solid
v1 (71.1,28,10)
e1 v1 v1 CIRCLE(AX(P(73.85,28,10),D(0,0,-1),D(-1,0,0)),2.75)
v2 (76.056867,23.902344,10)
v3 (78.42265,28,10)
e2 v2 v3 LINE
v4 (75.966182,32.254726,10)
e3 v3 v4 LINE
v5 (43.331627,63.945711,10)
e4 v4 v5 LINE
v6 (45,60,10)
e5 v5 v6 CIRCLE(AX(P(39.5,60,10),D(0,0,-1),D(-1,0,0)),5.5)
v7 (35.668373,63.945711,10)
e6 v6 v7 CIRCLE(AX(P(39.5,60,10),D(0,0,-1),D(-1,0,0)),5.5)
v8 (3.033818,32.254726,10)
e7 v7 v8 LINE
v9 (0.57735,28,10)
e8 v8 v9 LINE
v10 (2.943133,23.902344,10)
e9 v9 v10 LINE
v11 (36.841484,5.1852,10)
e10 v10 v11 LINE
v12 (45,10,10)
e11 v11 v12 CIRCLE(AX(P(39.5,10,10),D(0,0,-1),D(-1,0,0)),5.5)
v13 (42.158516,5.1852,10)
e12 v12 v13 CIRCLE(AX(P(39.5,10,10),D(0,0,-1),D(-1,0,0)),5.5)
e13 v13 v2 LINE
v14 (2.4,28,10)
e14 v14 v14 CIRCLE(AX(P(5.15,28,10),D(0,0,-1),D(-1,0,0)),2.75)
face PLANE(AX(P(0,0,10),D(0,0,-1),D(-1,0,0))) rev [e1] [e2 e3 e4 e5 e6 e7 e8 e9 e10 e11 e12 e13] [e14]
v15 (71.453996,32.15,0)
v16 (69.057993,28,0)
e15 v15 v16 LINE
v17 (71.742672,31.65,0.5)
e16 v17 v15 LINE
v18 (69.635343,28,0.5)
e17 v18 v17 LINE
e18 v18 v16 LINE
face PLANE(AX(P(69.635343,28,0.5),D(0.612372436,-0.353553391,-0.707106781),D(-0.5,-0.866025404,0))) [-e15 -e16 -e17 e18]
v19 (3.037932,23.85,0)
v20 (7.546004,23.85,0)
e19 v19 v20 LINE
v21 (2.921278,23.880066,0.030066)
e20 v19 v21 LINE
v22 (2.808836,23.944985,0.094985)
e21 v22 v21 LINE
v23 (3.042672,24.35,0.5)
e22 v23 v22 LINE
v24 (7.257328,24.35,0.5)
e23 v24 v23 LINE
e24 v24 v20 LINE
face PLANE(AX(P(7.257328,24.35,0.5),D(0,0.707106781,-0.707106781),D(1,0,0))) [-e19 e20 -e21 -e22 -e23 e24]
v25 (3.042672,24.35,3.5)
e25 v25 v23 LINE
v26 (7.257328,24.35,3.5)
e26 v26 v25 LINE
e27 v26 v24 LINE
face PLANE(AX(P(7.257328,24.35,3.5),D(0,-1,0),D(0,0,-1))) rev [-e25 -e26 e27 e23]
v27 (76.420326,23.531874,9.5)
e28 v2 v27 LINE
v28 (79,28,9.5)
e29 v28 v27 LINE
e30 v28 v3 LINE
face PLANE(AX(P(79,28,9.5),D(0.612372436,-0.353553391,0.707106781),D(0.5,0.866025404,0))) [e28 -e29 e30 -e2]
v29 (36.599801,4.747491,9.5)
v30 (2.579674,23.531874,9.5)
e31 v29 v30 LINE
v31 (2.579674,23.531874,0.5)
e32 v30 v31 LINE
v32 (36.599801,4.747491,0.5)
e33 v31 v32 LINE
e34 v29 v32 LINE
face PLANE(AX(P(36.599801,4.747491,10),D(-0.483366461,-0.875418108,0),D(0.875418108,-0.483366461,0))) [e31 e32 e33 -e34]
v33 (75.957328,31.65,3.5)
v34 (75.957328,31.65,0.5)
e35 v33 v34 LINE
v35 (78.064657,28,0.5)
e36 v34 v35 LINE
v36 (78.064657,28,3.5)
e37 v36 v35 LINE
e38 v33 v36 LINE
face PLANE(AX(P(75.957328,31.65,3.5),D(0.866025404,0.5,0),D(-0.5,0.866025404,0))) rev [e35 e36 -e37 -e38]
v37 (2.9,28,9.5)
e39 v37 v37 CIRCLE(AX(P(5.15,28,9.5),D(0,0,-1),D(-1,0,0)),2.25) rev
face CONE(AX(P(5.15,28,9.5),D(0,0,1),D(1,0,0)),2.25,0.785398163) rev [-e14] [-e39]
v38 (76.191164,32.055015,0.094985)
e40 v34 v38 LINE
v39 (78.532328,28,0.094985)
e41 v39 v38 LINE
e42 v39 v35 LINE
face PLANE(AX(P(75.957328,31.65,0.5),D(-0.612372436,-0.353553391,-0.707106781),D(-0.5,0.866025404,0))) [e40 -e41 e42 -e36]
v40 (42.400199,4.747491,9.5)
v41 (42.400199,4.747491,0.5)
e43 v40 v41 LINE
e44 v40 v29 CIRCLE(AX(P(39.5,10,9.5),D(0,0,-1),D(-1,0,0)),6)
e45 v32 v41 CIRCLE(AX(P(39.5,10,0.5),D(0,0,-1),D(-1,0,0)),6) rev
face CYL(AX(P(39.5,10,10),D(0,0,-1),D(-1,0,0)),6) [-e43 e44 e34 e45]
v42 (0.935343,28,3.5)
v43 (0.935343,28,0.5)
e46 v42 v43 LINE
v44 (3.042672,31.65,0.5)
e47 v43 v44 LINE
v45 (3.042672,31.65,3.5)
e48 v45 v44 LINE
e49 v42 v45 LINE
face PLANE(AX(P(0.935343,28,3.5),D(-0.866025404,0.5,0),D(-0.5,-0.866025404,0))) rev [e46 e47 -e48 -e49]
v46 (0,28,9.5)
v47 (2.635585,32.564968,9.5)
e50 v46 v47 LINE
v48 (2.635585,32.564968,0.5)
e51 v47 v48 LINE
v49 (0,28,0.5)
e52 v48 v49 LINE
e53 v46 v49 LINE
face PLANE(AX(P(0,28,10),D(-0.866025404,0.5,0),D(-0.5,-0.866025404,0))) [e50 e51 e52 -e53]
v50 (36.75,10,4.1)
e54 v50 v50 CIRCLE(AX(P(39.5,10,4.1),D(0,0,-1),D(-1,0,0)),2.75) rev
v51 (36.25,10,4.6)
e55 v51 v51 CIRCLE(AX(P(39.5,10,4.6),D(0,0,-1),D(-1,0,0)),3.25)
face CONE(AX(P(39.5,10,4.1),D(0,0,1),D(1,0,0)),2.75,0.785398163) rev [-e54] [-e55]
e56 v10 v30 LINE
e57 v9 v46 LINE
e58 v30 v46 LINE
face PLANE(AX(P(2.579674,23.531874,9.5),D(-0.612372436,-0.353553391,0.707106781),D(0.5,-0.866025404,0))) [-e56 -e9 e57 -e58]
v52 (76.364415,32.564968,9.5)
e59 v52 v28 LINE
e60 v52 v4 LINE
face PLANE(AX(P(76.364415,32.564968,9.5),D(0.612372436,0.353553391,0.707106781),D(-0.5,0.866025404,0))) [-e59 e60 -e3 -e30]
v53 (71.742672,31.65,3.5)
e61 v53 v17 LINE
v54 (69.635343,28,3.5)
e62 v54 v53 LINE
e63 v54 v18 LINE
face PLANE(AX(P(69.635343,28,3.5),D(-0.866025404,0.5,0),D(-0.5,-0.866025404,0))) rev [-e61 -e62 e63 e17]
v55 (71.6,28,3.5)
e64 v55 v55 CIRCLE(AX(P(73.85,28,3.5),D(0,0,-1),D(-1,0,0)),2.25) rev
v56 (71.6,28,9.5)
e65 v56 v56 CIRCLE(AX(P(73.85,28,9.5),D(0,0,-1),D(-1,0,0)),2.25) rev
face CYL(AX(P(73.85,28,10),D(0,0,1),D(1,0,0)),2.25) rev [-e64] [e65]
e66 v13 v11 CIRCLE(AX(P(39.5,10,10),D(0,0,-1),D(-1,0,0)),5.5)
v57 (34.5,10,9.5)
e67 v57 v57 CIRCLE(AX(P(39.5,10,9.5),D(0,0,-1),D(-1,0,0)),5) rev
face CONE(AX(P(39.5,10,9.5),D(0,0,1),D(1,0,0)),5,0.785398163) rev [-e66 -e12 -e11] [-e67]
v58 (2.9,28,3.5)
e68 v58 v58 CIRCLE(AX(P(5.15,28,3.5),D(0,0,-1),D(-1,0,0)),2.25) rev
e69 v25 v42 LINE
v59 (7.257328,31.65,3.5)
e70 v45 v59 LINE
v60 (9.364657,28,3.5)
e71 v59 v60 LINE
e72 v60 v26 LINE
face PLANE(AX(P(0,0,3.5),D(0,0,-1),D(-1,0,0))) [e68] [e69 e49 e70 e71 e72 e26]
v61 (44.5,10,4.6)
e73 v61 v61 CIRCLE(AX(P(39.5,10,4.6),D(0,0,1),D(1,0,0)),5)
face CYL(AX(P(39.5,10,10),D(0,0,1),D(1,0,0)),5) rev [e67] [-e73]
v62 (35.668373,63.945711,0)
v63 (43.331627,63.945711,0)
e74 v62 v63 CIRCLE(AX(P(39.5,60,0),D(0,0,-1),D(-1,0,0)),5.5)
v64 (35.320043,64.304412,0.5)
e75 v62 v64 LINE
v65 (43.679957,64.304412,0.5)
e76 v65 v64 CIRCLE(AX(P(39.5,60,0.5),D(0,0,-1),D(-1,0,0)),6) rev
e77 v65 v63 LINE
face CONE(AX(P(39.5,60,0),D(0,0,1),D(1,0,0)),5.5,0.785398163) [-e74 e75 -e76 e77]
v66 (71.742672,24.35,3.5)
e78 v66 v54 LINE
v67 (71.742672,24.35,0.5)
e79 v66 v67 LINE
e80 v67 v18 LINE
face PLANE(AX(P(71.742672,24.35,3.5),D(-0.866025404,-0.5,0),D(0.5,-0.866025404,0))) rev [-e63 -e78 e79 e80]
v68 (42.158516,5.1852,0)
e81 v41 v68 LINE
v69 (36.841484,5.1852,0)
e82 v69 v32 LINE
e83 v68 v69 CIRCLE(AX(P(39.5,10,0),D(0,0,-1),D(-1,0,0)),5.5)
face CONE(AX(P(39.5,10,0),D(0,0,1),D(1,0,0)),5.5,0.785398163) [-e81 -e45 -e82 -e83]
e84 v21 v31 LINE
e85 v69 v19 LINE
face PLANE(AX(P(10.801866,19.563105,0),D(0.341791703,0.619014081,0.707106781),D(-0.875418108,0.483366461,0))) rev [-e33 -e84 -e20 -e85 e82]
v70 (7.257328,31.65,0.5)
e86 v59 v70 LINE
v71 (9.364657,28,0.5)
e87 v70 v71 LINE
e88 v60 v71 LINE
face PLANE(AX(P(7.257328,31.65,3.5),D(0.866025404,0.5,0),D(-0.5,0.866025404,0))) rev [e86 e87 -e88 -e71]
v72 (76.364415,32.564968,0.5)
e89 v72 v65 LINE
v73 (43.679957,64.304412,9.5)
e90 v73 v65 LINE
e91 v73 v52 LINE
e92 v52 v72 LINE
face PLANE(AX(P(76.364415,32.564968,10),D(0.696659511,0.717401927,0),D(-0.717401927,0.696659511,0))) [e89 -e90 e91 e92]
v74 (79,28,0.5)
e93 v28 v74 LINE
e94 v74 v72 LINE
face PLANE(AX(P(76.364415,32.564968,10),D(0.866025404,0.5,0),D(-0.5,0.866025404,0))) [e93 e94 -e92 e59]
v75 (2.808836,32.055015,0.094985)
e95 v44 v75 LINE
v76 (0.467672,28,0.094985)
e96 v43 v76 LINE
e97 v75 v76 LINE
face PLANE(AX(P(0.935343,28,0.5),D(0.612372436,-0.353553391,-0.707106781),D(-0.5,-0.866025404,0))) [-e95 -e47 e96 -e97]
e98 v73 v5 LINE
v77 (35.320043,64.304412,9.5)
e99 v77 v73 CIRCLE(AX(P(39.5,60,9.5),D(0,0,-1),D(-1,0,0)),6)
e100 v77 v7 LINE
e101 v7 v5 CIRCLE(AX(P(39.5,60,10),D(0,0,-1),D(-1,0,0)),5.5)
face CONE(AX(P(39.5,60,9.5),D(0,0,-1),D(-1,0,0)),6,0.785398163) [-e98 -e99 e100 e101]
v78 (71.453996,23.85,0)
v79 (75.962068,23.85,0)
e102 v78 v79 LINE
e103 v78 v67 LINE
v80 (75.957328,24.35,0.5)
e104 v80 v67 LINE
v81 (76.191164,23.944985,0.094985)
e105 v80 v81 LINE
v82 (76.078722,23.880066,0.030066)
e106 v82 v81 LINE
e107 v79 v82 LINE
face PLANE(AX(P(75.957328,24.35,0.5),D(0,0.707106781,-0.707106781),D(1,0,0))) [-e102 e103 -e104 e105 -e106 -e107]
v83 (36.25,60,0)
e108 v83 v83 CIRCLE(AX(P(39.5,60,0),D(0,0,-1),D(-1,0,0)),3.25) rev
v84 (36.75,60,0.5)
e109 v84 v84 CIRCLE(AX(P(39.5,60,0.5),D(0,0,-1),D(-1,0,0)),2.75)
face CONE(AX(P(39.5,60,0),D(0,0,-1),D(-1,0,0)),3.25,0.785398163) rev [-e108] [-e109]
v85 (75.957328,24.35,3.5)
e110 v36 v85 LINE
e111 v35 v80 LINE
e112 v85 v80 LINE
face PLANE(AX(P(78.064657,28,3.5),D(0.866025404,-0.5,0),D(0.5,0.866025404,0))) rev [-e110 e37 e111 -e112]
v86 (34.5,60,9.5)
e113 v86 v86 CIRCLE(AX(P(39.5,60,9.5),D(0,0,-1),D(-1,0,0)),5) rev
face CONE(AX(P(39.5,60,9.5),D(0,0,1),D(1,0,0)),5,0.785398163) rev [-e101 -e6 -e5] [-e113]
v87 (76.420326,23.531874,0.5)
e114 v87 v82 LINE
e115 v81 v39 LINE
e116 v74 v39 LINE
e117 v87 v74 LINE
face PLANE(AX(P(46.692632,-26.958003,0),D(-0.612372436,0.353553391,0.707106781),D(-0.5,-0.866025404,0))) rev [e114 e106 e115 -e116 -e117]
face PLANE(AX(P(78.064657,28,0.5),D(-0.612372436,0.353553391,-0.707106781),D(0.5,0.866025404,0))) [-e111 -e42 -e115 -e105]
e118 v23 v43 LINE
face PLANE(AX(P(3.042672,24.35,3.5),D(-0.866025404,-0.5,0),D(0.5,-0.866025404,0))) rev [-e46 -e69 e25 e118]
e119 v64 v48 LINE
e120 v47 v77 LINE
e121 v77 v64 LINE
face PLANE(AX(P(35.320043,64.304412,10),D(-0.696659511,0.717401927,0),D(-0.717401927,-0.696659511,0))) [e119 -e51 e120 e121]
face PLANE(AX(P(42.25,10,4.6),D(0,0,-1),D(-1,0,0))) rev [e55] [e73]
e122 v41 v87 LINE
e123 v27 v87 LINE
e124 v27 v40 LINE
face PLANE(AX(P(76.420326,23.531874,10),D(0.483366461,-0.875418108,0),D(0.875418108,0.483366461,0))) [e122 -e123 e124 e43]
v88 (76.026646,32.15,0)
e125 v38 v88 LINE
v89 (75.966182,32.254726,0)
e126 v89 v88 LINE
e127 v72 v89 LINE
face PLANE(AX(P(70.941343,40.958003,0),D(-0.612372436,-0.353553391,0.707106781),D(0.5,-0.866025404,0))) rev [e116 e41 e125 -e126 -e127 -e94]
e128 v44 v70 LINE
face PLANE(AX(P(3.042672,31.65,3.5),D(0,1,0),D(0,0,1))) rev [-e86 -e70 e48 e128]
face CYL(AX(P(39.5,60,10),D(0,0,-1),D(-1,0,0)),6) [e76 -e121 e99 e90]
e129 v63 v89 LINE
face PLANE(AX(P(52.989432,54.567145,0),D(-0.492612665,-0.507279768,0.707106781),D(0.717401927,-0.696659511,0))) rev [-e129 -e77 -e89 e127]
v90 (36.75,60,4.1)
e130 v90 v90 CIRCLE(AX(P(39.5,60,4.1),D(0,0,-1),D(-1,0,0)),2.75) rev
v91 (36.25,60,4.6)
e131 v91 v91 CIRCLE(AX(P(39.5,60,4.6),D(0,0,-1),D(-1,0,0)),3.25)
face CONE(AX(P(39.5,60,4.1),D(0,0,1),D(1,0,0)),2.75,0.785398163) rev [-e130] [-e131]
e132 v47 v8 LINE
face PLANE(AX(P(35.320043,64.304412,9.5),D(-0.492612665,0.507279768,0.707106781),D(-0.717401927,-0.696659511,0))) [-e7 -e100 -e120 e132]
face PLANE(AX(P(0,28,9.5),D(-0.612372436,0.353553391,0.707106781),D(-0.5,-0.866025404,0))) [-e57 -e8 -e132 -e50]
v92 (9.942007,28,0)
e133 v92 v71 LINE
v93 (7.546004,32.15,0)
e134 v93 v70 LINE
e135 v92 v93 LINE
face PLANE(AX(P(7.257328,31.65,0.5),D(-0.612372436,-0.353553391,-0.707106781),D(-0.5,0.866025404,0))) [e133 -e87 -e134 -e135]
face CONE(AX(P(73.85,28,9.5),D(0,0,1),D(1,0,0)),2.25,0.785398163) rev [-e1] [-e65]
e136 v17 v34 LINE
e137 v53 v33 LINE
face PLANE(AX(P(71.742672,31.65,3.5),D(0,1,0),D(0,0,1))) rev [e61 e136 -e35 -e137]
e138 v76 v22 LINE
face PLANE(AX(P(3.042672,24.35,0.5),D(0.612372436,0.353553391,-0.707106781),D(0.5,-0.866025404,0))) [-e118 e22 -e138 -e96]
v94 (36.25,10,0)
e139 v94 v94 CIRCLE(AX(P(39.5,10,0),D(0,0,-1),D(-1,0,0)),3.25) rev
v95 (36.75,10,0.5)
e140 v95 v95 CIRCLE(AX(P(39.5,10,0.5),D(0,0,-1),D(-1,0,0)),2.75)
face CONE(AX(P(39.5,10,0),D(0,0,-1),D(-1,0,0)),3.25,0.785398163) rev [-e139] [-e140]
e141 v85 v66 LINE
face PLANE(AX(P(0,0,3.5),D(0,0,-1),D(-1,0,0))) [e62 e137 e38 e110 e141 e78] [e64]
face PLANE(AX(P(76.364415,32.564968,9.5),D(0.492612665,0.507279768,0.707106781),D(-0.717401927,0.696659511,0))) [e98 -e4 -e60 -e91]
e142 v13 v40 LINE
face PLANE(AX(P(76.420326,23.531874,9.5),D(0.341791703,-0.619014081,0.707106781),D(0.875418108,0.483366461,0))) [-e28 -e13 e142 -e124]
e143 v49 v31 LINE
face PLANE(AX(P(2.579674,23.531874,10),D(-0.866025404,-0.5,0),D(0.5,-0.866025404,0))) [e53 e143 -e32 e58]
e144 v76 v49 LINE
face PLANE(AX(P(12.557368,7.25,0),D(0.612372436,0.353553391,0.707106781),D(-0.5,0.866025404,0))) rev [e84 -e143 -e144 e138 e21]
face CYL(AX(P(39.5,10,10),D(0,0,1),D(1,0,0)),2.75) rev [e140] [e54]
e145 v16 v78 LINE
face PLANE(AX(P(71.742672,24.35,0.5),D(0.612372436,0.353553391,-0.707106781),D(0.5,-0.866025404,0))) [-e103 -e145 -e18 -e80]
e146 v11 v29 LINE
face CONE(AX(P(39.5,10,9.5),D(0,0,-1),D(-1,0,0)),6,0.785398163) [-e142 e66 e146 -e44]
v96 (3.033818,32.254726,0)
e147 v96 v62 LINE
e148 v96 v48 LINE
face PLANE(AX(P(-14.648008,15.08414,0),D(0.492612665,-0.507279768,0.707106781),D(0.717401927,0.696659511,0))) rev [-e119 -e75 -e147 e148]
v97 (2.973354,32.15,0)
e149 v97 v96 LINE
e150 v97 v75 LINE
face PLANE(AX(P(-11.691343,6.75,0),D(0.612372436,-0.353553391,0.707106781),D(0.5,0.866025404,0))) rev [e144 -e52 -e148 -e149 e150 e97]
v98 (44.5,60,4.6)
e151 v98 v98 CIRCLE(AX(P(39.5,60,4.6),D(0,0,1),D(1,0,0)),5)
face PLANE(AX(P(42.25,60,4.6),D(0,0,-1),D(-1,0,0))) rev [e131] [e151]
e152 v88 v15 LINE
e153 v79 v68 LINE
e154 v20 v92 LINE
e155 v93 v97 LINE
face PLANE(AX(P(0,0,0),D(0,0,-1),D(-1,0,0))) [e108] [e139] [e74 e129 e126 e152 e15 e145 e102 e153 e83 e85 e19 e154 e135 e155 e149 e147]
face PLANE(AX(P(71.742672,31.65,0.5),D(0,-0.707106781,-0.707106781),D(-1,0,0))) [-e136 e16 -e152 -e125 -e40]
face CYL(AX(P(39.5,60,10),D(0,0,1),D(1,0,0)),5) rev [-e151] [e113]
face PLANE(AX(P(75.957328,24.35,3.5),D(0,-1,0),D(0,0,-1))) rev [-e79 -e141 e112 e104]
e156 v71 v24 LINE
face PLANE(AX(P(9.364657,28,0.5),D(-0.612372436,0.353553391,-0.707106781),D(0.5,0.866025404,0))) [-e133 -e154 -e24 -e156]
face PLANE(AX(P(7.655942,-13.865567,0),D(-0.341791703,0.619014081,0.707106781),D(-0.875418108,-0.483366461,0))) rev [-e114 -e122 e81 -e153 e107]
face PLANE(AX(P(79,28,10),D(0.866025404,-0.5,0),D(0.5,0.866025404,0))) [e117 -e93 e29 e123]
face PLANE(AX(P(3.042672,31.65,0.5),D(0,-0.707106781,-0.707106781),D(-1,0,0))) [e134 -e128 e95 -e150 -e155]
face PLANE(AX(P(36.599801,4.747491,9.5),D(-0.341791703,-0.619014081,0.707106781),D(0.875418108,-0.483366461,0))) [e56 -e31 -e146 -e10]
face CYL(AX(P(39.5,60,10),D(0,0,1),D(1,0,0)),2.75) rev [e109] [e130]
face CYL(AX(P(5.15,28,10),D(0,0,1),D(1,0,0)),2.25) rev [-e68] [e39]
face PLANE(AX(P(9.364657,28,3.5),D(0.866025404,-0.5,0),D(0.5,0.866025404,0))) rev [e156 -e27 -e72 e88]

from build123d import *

# Parameters (mm, degrees)
SKETCH1_W                                       = 79
SKETCH1_H                                       = 70
BOSS_EXTRUDE1_DEPTH                             = 10
M4_CLEARANCE_HOLE1_D                            = 4.5
CUT_EXTRUDE3_DEPTH                              = 3.5
CBORE_FOR_M5_SOCKET_HEAD_CAP_SCREW1_D           = 5.5
CBORE_FOR_M5_SOCKET_HEAD_CAP_SCREW1_CBORE_D     = 10
CBORE_FOR_M5_SOCKET_HEAD_CAP_SCREW1_CBORE_DEPTH = 5.4
CUT_EXTRUDE4_DEPTH                              = 10
CHAMFER1_SIZE                                   = 0.5
CHAMFER2_SIZE                                   = 0.5


with BuildPart() as part:
    # Sketch1 → Boss-Extrude1 (new body)
    with BuildSketch(Plane.XY):
        with Locations((39.5, 35)):
            Rectangle(SKETCH1_W, SKETCH1_H)
    extrude(amount=BOSS_EXTRUDE1_DEPTH)

    # M4 Clearance Hole1 (through all)
    with Locations(Plane.XY.offset(10)):
        with Locations((5.15, 28), (73.85, 28)):
            Hole(M4_CLEARANCE_HOLE1_D / 2)

    # Sketch11 → Cut-Extrude3 (cut)
    with BuildSketch(Plane(origin=(0, 0, 0), x_dir=(-1, 0, 0), z_dir=(0, 0, -1))):
        Polygon((-69.635343035, 28), (-71.742671517, 31.65), (-75.957328483, 31.65), (-78.064656965, 28), (-75.957328483, 24.35), (-71.742671517, 24.35), align=None)
        Polygon((-9.364656965, 28), (-7.257328483, 24.35), (-3.042671517, 24.35), (-0.935343035, 28), (-3.042671517, 31.65), (-7.257328483, 31.65), align=None)
    extrude(amount=-CUT_EXTRUDE3_DEPTH, mode=Mode.SUBTRACT)

    # CBORE for M5 Socket Head Cap Screw1 (through all)
    with Locations(Plane.XY.offset(10)):
        with Locations((39.5, 60), (39.5, 10)):
            CounterBoreHole(CBORE_FOR_M5_SOCKET_HEAD_CAP_SCREW1_D / 2, CBORE_FOR_M5_SOCKET_HEAD_CAP_SCREW1_CBORE_D / 2, CBORE_FOR_M5_SOCKET_HEAD_CAP_SCREW1_CBORE_DEPTH)

    # Sketch17 → Cut-Extrude4 (cut)
    with BuildSketch(Plane(origin=(0, 0, 0), x_dir=(-1, 0, 0), z_dir=(0, 0, -1))):
        with BuildLine():
            Line((-125.188021535, 28), (-105.497086029, -6.105700744))
            Line((-105.497086029, -6.105700744), (-61.734857215, -30.269232978))
            ThreePointArc((-61.734857215, -30.269232978), (-39.5, -36), (-17.265142785, -30.269232978))
            Line((-17.265142785, -30.269232978), (26.497086029, -6.105700744))
            Line((26.497086029, -6.105700744), (46.188021535, 28))
            Line((46.188021535, 28), (29.223015539, 57.384252336))
            Line((29.223015539, 57.384252336), (-7.453662483, 93.00048866))
            ThreePointArc((-7.453662483, 93.00048866), (-39.5, 106), (-71.546337517, 93.00048866))
            Line((-71.546337517, 93.00048866), (-108.223015539, 57.384252336))
            Line((-108.223015539, 57.384252336), (-125.188021535, 28))
        make_face()
        with BuildLine():
            Line((-76.364414771, 32.564967524), (-43.679957067, 64.304411564))
            ThreePointArc((-43.679957067, 64.304411564), (-39.5, 66), (-35.320042933, 64.304411564))
            Line((-35.320042933, 64.304411564), (-2.635585229, 32.564967524))
            Line((-2.635585229, 32.564967524), (0, 28))
            Line((0, 28), (-2.579673838, 23.531873846))
            Line((-2.579673838, 23.531873846), (-36.599801233, 4.747491351))
            ThreePointArc((-36.599801233, 4.747491351), (-39.5, 4), (-42.400198767, 4.747491351))
            Line((-42.400198767, 4.747491351), (-76.420326162, 23.531873846))
            Line((-76.420326162, 23.531873846), (-79, 28))
            Line((-79, 28), (-76.364414771, 32.564967524))
        make_face(mode=Mode.SUBTRACT)
    extrude(amount=-CUT_EXTRUDE4_DEPTH, mode=Mode.SUBTRACT)

    # Chamfer1
    # the kernel refuses this chamfer: 0.5 mm, written as the material it takes off along each edge
    with BuildSketch(Plane(origin=(39.5, 10, 10), x_dir=(1, 0, 0), z_dir=(0, -1, 0))) as chamfer1_piece_1:
        Polygon((5 + CHAMFER1_SIZE, 0), (5, -CHAMFER1_SIZE), (5, 0), align=None)
    revolve(axis=Axis((39.5, 10, 10), (0, 0, 1)), mode=Mode.SUBTRACT)
    with BuildSketch(Plane(origin=(39.5, 10, 0), x_dir=(-1, 0, 0), z_dir=(0, -1, 0))) as chamfer1_piece_2:
        Polygon((2.75 + CHAMFER1_SIZE, 0), (2.75, -CHAMFER1_SIZE), (2.75, 0), align=None)
    revolve(axis=Axis((39.5, 10, 0), (0, 0, -1)), mode=Mode.SUBTRACT)
    with BuildSketch(Plane(origin=(39.5, 60, 10), x_dir=(1, 0, 0), z_dir=(0, -1, 0))) as chamfer1_piece_3:
        Polygon((5 + CHAMFER1_SIZE, 0), (5, -CHAMFER1_SIZE), (5, 0), align=None)
    revolve(axis=Axis((39.5, 60, 10), (0, 0, 1)), mode=Mode.SUBTRACT)
    with BuildSketch(Plane(origin=(39.5, 60, 0), x_dir=(-1, 0, 0), z_dir=(0, -1, 0))) as chamfer1_piece_4:
        Polygon((2.75 + CHAMFER1_SIZE, 0), (2.75, -CHAMFER1_SIZE), (2.75, 0), align=None)
    revolve(axis=Axis((39.5, 60, 0), (0, 0, -1)), mode=Mode.SUBTRACT)
    with BuildSketch(Plane(origin=(73.85, 28, 10), x_dir=(-1, 0, 0), z_dir=(0, -1, 0))) as chamfer1_piece_5:
        Polygon((2.25 + CHAMFER1_SIZE, 0), (2.25, CHAMFER1_SIZE), (2.25, 0), align=None)
    revolve(axis=Axis((73.85, 28, 10), (0, 0, -1)), mode=Mode.SUBTRACT)
    with BuildSketch(Plane(origin=(75.777405415, 22.418302447, 10), x_dir=(-0.8656979742248806, 0.49981095845564805, 0.02749587661058518), z_dir=(0.49999999999999967, 0.8660254037844388, 0)), Plane(origin=(-0.642920747, 29.113571399, 0), x_dir=(-0.023812127644091078, -0.013747938305293715, 0.9996219169112968), z_dir=(0.5000000000000001, -0.8660254037844387, 0))) as chamfer1_piece_6:
        Polygon((CHAMFER1_SIZE * 0.999621916911, -CHAMFER1_SIZE * 0.0274958766106), (-CHAMFER1_SIZE * 0.0274958766106, -CHAMFER1_SIZE * 0.999621916911), (0, 0), align=None)
    extrude(amount=7.731030664, mode=Mode.SUBTRACT)
    with BuildSketch(Plane(origin=(42.400198767, 4.747491351, 10), x_dir=(-0.4831837085028112, 0.8750871274375402, 0.027495876610585696), z_dir=(0.8754181082198028, 0.4833664611874326, 0)), Plane(origin=(1.45402491, 24.153406499, 10), x_dir=(0.4831837085028113, 0.8750871274375401, 0.027495876610585605), z_dir=(0.8754181082198027, -0.48336646118743265, 0))) as chamfer1_piece_7:
        Polygon((CHAMFER1_SIZE * 0.999621916911, -CHAMFER1_SIZE * 0.0274958766106), (-CHAMFER1_SIZE * 0.0274958766106, -CHAMFER1_SIZE * 0.999621916911), (0, 0), align=None)
    extrude(amount=40.147417552, mode=Mode.SUBTRACT)
    with BuildSketch(Plane(origin=(39.5, 10, 10), x_dir=(-0.48336646118743537, -0.8754181082198011, 0), z_dir=(-0.8754181082198011, 0.48336646118743537, 0))) as chamfer1_piece_8:
        Polygon((6 - CHAMFER1_SIZE, 0), (6, -CHAMFER1_SIZE), (6, 0), align=None)
    revolve(axis=Axis((39.5, 10, 10), (0, 0, 1)), revolution_arc=57.811005445, mode=Mode.SUBTRACT)
    with BuildSketch(Plane(origin=(-0.642920747, 29.113571399, 10), x_dir=(-0.023812127644091095, -0.013747938305293727, -0.9996219169112968), z_dir=(0.5000000000000001, -0.8660254037844387, 0)), Plane(origin=(75.777405415, 22.418302447, 0), x_dir=(-0.8656979742248806, 0.49981095845564805, -0.02749587661058547), z_dir=(0.49999999999999967, 0.8660254037844388, 0))) as chamfer1_piece_9:
        Polygon((CHAMFER1_SIZE * 0.999621916911, CHAMFER1_SIZE * 0.0274958766106), (-CHAMFER1_SIZE * 0.0274958766106, CHAMFER1_SIZE * 0.999621916911), (0, 0), align=None)
    extrude(amount=7.731030664, mode=Mode.SUBTRACT)
    with BuildSketch(Plane(origin=(3.278505976, 33.678538923, 10), x_dir=(-0.023812127644088344, 0.013747938305292137, -0.9996219169112968), z_dir=(-0.5000000000000001, -0.8660254037844387, 0)), Plane(origin=(79.642920747, 26.886428601, 0), x_dir=(-0.865697974224879, -0.49981095845565066, -0.02749587661058581), z_dir=(-0.5000000000000023, 0.8660254037844374, 0))) as chamfer1_piece_10:
        Polygon((CHAMFER1_SIZE * 0.999621916911, CHAMFER1_SIZE * 0.0274958766106), (-CHAMFER1_SIZE * 0.0274958766106, CHAMFER1_SIZE * 0.999621916911), (0, 0), align=None)
    extrude(amount=7.842853445, mode=Mode.SUBTRACT)
    with BuildSketch(Plane(origin=(35.320042933, 64.304411564, 10), x_dir=(-0.019155263960327032, 0.019725594875552394, -0.999621916911297), z_dir=(-0.7174019273843597, -0.6966595112285529, 0)), Plane(origin=(77.286879937, 31.669173817, 0), x_dir=(-0.6963961160487728, -0.7171306898478127, -0.027495876610586643), z_dir=(-0.7174019273843598, 0.6966595112285526, 0))) as chamfer1_piece_11:
        Polygon((CHAMFER1_SIZE * 0.999621916911, CHAMFER1_SIZE * 0.0274958766106), (-CHAMFER1_SIZE * 0.0274958766106, CHAMFER1_SIZE * 0.999621916911), (0, 0), align=None)
    extrude(amount=46.845320018, mode=Mode.SUBTRACT)
    with BuildSketch(Plane(origin=(39.5, 60, 10), x_dir=(0.6966595112285513, 0.7174019273843611, 0), z_dir=(0.7174019273843611, -0.6966595112285513, 0))) as chamfer1_piece_12:
        Polygon((6 - CHAMFER1_SIZE, 0), (6, -CHAMFER1_SIZE), (6, 0), align=None)
    revolve(axis=Axis((39.5, 60, 10), (0, 0, 1)), revolution_arc=88.31921352, mode=Mode.SUBTRACT)
    with BuildSketch(Plane(origin=(77.286879937, 31.669173817, 10), x_dir=(-0.6963961160487728, -0.7171306898478127, 0.027495876610585824), z_dir=(-0.7174019273843598, 0.6966595112285526, 0)), Plane(origin=(35.320042933, 64.304411564, 0), x_dir=(-0.019155263960327015, 0.019725594875552376, 0.999621916911297), z_dir=(-0.7174019273843597, -0.6966595112285529, 0))) as chamfer1_piece_13:
        Polygon((CHAMFER1_SIZE * 0.999621916911, -CHAMFER1_SIZE * 0.0274958766106), (-CHAMFER1_SIZE * 0.0274958766106, -CHAMFER1_SIZE * 0.999621916911), (0, 0), align=None)
    extrude(amount=46.845320018, mode=Mode.SUBTRACT)
    with BuildSketch(Plane(origin=(79.642920747, 26.886428601, 10), x_dir=(-0.865697974224879, -0.49981095845565066, 0.02749587661058518), z_dir=(-0.5000000000000023, 0.8660254037844374, 0)), Plane(origin=(3.278505976, 33.678538923, 0), x_dir=(-0.023812127644088323, 0.013747938305292124, 0.9996219169112968), z_dir=(-0.5000000000000001, -0.8660254037844387, 0))) as chamfer1_piece_14:
        Polygon((CHAMFER1_SIZE * 0.999621916911, -CHAMFER1_SIZE * 0.0274958766106), (-CHAMFER1_SIZE * 0.0274958766106, -CHAMFER1_SIZE * 0.999621916911), (0, 0), align=None)
    extrude(amount=7.842853445, mode=Mode.SUBTRACT)
    with BuildSketch(Plane(origin=(5.15, 28, 10), x_dir=(-1, 0, 0), z_dir=(0, -1, 0))) as chamfer1_piece_15:
        Polygon((2.25 + CHAMFER1_SIZE, 0), (2.25, CHAMFER1_SIZE), (2.25, 0), align=None)
    revolve(axis=Axis((5.15, 28, 10), (0, 0, -1)), mode=Mode.SUBTRACT)
    with BuildSketch(Plane(origin=(39.5, 60, 0), x_dir=(0.6966595112285513, 0.7174019273843611, 0), z_dir=(0.7174019273843611, -0.6966595112285513, 0))) as chamfer1_piece_16:
        Polygon((6 - CHAMFER1_SIZE, 0), (6, CHAMFER1_SIZE), (6, 0), align=None)
    revolve(axis=Axis((39.5, 60, 0), (0, 0, 1)), revolution_arc=88.31921352, mode=Mode.SUBTRACT)
    with BuildSketch(Plane(origin=(1.45402491, 24.153406499, 0), x_dir=(0.4831837085028113, 0.8750871274375401, -0.02749587661058645), z_dir=(0.8754181082198027, -0.48336646118743265, 0)), Plane(origin=(42.400198767, 4.747491351, 0), x_dir=(-0.4831837085028112, 0.8750871274375402, -0.027495876610586435), z_dir=(0.8754181082198028, 0.4833664611874326, 0))) as chamfer1_piece_17:
        Polygon((CHAMFER1_SIZE * 0.999621916911, CHAMFER1_SIZE * 0.0274958766106), (-CHAMFER1_SIZE * 0.0274958766106, CHAMFER1_SIZE * 0.999621916911), (0, 0), align=None)
    extrude(amount=40.147417552, mode=Mode.SUBTRACT)
    with BuildSketch(Plane(origin=(39.5, 10, 0), x_dir=(-0.48336646118743537, -0.8754181082198011, 0), z_dir=(-0.8754181082198011, 0.48336646118743537, 0))) as chamfer1_piece_18:
        Polygon((6 - CHAMFER1_SIZE, 0), (6, CHAMFER1_SIZE), (6, 0), align=None)
    revolve(axis=Axis((39.5, 10, 0), (0, 0, 1)), revolution_arc=57.811005445, mode=Mode.SUBTRACT)
    with BuildSketch(Plane(origin=(72.385592264, 23.236428601, 0), x_dir=(-0.8656979742248802, -0.49981095845564877, -0.02749587661058547), z_dir=(-0.5000000000000004, 0.8660254037844384, 0))) as chamfer1_piece_19_section:
        Polygon((CHAMFER1_SIZE * 0.999621916911, CHAMFER1_SIZE * 0.0274958766106), (-CHAMFER1_SIZE * 0.0274958766106, CHAMFER1_SIZE * 0.999621916911), (0, 0), align=None)
    chamfer1_piece_19 = extrude(amount=6.786339953, mode=Mode.PRIVATE)
    chamfer1_piece_19 = split(chamfer1_piece_19, bisect_by=Plane(origin=(70.550147439, 24.35, 0.167332088), z_dir=(0, 1, 0)), keep=Keep.TOP, mode=Mode.PRIVATE)
    chamfer1_piece_19 = split(chamfer1_piece_19, bisect_by=Plane(origin=(69.039080996, 26.967243853, 0.167332088), z_dir=(0.8660254037844369, -0.5000000000000031, 0)), keep=Keep.TOP, mode=Mode.PRIVATE)
    add(chamfer1_piece_19, mode=Mode.SUBTRACT)
    with BuildSketch(Plane(origin=(68.992422288, 26.886428601, 0), x_dir=(-0.8656979742248786, 0.4998109584556514, -0.027495876610586244), z_dir=(0.5000000000000031, 0.866025403784437, 0))) as chamfer1_piece_20_section:
        Polygon((CHAMFER1_SIZE * 0.999621916911, CHAMFER1_SIZE * 0.0274958766106), (-CHAMFER1_SIZE * 0.0274958766106, CHAMFER1_SIZE * 0.999621916911), (0, 0), align=None)
    chamfer1_piece_20 = extrude(amount=6.786339953, mode=Mode.PRIVATE)
    chamfer1_piece_20 = split(chamfer1_piece_20, bisect_by=Plane(origin=(69.039080996, 29.032756147, 0.167332088), z_dir=(0.8660254037844384, 0.5000000000000004, 0)), keep=Keep.TOP, mode=Mode.PRIVATE)
    chamfer1_piece_20 = split(chamfer1_piece_20, bisect_by=Plane(origin=(70.550147439, 31.65, 0.167332088), z_dir=(0, -1, 0)), keep=Keep.TOP, mode=Mode.PRIVATE)
    add(chamfer1_piece_20, mode=Mode.SUBTRACT)
    with BuildSketch(Plane(origin=(70.456830023, 31.65, 0), x_dir=(0, 0.9996219169112968, -0.027495876610586483), z_dir=(1, 0, 0))) as chamfer1_piece_21_section:
        Polygon((CHAMFER1_SIZE * 0.999621916911, CHAMFER1_SIZE * 0.0274958766106), (-CHAMFER1_SIZE * 0.0274958766106, CHAMFER1_SIZE * 0.999621916911), (0, 0), align=None)
    chamfer1_piece_21 = extrude(amount=6.786339953, mode=Mode.PRIVATE)
    chamfer1_piece_21 = split(chamfer1_piece_21, bisect_by=Plane(origin=(72.338933557, 32.682756147, 0.167332088), z_dir=(0.8660254037844369, -0.5000000000000031, 0)), keep=Keep.TOP, mode=Mode.PRIVATE)
    chamfer1_piece_21 = split(chamfer1_piece_21, bisect_by=Plane(origin=(75.361066443, 32.682756147, 0.167332088), z_dir=(-0.8660254037844393, -0.499999999999999, 0)), keep=Keep.TOP, mode=Mode.PRIVATE)
    add(chamfer1_piece_21, mode=Mode.SUBTRACT)
    with BuildSketch(Plane(origin=(75.314407736, 32.763571399, 0), x_dir=(0.8656979742248809, 0.4998109584556474, -0.02749587661058581), z_dir=(0.499999999999999, -0.8660254037844393, 0))) as chamfer1_piece_22_section:
        Polygon((CHAMFER1_SIZE * 0.999621916911, CHAMFER1_SIZE * 0.0274958766106), (-CHAMFER1_SIZE * 0.0274958766106, CHAMFER1_SIZE * 0.999621916911), (0, 0), align=None)
    chamfer1_piece_22 = extrude(amount=6.786339953, mode=Mode.PRIVATE)
    chamfer1_piece_22 = split(chamfer1_piece_22, bisect_by=Plane(origin=(78.660919005, 29.032756147, 0.167332088), z_dir=(-0.866025403784439, 0.4999999999999994, 0)), keep=Keep.TOP, mode=Mode.PRIVATE)
    chamfer1_piece_22 = split(chamfer1_piece_22, bisect_by=Plane(origin=(77.14985256, 31.65, 0.167332088), z_dir=(0, -1, 0)), keep=Keep.TOP, mode=Mode.PRIVATE)
    add(chamfer1_piece_22, mode=Mode.SUBTRACT)
    with BuildSketch(Plane(origin=(78.707577712, 29.113571399, 0), x_dir=(0.8656979742248807, -0.4998109584556477, -0.02749587661058552), z_dir=(-0.4999999999999994, -0.866025403784439, 0))) as chamfer1_piece_23_section:
        Polygon((CHAMFER1_SIZE * 0.999621916911, CHAMFER1_SIZE * 0.0274958766106), (-CHAMFER1_SIZE * 0.0274958766106, CHAMFER1_SIZE * 0.999621916911), (0, 0), align=None)
    chamfer1_piece_23 = extrude(amount=6.786339953, mode=Mode.PRIVATE)
    chamfer1_piece_23 = split(chamfer1_piece_23, bisect_by=Plane(origin=(77.149852561, 24.35, 0.167332088), z_dir=(0, 1, 0)), keep=Keep.TOP, mode=Mode.PRIVATE)
    chamfer1_piece_23 = split(chamfer1_piece_23, bisect_by=Plane(origin=(78.660919004, 26.967243853, 0.167332088), z_dir=(-0.8660254037844393, -0.499999999999999, 0)), keep=Keep.TOP, mode=Mode.PRIVATE)
    add(chamfer1_piece_23, mode=Mode.SUBTRACT)
    with BuildSketch(Plane(origin=(77.243169977, 24.35, 0), x_dir=(0, -0.9996219169112968, -0.027495876610586292), z_dir=(-1, 0, 0))) as chamfer1_piece_24_section:
        Polygon((CHAMFER1_SIZE * 0.999621916911, CHAMFER1_SIZE * 0.0274958766106), (-CHAMFER1_SIZE * 0.0274958766106, CHAMFER1_SIZE * 0.999621916911), (0, 0), align=None)
    chamfer1_piece_24 = extrude(amount=6.786339953, mode=Mode.PRIVATE)
    chamfer1_piece_24 = split(chamfer1_piece_24, bisect_by=Plane(origin=(72.338933557, 23.317243853, 0.167332088), z_dir=(0.8660254037844384, 0.5000000000000004, 0)), keep=Keep.TOP, mode=Mode.PRIVATE)
    chamfer1_piece_24 = split(chamfer1_piece_24, bisect_by=Plane(origin=(75.361066443, 23.317243853, 0.167332088), z_dir=(-0.866025403784439, 0.4999999999999994, 0)), keep=Keep.TOP, mode=Mode.PRIVATE)
    add(chamfer1_piece_24, mode=Mode.SUBTRACT)
    with BuildSketch(Plane(origin=(6.614407736, 32.763571399, 0), x_dir=(0.8656979742248808, 0.4998109584556476, -0.02749587661058651), z_dir=(0.4999999999999992, -0.8660254037844392, 0))) as chamfer1_piece_25_section:
        Polygon((CHAMFER1_SIZE * 0.999621916911, CHAMFER1_SIZE * 0.0274958766106), (-CHAMFER1_SIZE * 0.0274958766106, CHAMFER1_SIZE * 0.999621916911), (0, 0), align=None)
    chamfer1_piece_25 = extrude(amount=6.786339953, mode=Mode.PRIVATE)
    chamfer1_piece_25 = split(chamfer1_piece_25, bisect_by=Plane(origin=(8.449852561, 31.65, 0.167332088), z_dir=(0, -1, 0)), keep=Keep.TOP, mode=Mode.PRIVATE)
    chamfer1_piece_25 = split(chamfer1_piece_25, bisect_by=Plane(origin=(9.960919004, 29.032756147, 0.167332088), z_dir=(-0.8660254037844382, 0.5000000000000009, 0)), keep=Keep.TOP, mode=Mode.PRIVATE)
    add(chamfer1_piece_25, mode=Mode.SUBTRACT)
    with BuildSketch(Plane(origin=(10.007577712, 29.113571399, 0), x_dir=(0.8656979742248798, -0.4998109584556492, -0.02749587661058651), z_dir=(-0.5000000000000009, -0.8660254037844382, 0))) as chamfer1_piece_26_section:
        Polygon((CHAMFER1_SIZE * 0.999621916911, CHAMFER1_SIZE * 0.0274958766106), (-CHAMFER1_SIZE * 0.0274958766106, CHAMFER1_SIZE * 0.999621916911), (0, 0), align=None)
    chamfer1_piece_26 = extrude(amount=6.786339953, mode=Mode.PRIVATE)
    chamfer1_piece_26 = split(chamfer1_piece_26, bisect_by=Plane(origin=(9.960919004, 26.967243853, 0.167332088), z_dir=(-0.8660254037844392, -0.4999999999999992, 0)), keep=Keep.TOP, mode=Mode.PRIVATE)
    chamfer1_piece_26 = split(chamfer1_piece_26, bisect_by=Plane(origin=(8.449852561, 24.35, 0.167332088), z_dir=(0, 1, 0)), keep=Keep.TOP, mode=Mode.PRIVATE)
    add(chamfer1_piece_26, mode=Mode.SUBTRACT)
    with BuildSketch(Plane(origin=(8.543169977, 24.35, 0), x_dir=(0, -0.9996219169112968, -0.027495876610586292), z_dir=(-1, 0, 0))) as chamfer1_piece_27_section:
        Polygon((CHAMFER1_SIZE * 0.999621916911, CHAMFER1_SIZE * 0.0274958766106), (-CHAMFER1_SIZE * 0.0274958766106, CHAMFER1_SIZE * 0.999621916911), (0, 0), align=None)
    chamfer1_piece_27 = extrude(amount=6.786339953, mode=Mode.PRIVATE)
    chamfer1_piece_27 = split(chamfer1_piece_27, bisect_by=Plane(origin=(6.661066443, 23.317243853, 0.167332088), z_dir=(-0.8660254037844382, 0.5000000000000009, 0)), keep=Keep.TOP, mode=Mode.PRIVATE)
    chamfer1_piece_27 = split(chamfer1_piece_27, bisect_by=Plane(origin=(3.638933557, 23.317243853, 0.167332088), z_dir=(0.8660254037844387, 0.5000000000000001, 0)), keep=Keep.TOP, mode=Mode.PRIVATE)
    add(chamfer1_piece_27, mode=Mode.SUBTRACT)
    with BuildSketch(Plane(origin=(3.685592264, 23.236428601, 0), x_dir=(-0.8656979742248803, -0.4998109584556484, -0.02749587661058664), z_dir=(-0.5000000000000001, 0.8660254037844387, 0))) as chamfer1_piece_28_section:
        Polygon((CHAMFER1_SIZE * 0.999621916911, CHAMFER1_SIZE * 0.0274958766106), (-CHAMFER1_SIZE * 0.0274958766106, CHAMFER1_SIZE * 0.999621916911), (0, 0), align=None)
    chamfer1_piece_28 = extrude(amount=6.786339953, mode=Mode.PRIVATE)
    chamfer1_piece_28 = split(chamfer1_piece_28, bisect_by=Plane(origin=(0.339080996, 26.967243853, 0.167332088), z_dir=(0.8660254037844388, -0.49999999999999983, 0)), keep=Keep.TOP, mode=Mode.PRIVATE)
    chamfer1_piece_28 = split(chamfer1_piece_28, bisect_by=Plane(origin=(1.850147439, 24.35, 0.167332088), z_dir=(0, 1, 0)), keep=Keep.TOP, mode=Mode.PRIVATE)
    add(chamfer1_piece_28, mode=Mode.SUBTRACT)
    with BuildSketch(Plane(origin=(0.292422288, 26.886428601, 0), x_dir=(-0.8656979742248805, 0.49981095845564816, -0.027495876610586473), z_dir=(0.49999999999999983, 0.8660254037844388, 0))) as chamfer1_piece_29_section:
        Polygon((CHAMFER1_SIZE * 0.999621916911, CHAMFER1_SIZE * 0.0274958766106), (-CHAMFER1_SIZE * 0.0274958766106, CHAMFER1_SIZE * 0.999621916911), (0, 0), align=None)
    chamfer1_piece_29 = extrude(amount=6.786339953, mode=Mode.PRIVATE)
    chamfer1_piece_29 = split(chamfer1_piece_29, bisect_by=Plane(origin=(1.850147439, 31.65, 0.167332088), z_dir=(0, -1, 0)), keep=Keep.TOP, mode=Mode.PRIVATE)
    chamfer1_piece_29 = split(chamfer1_piece_29, bisect_by=Plane(origin=(0.339080996, 29.032756147, 0.167332088), z_dir=(0.8660254037844387, 0.5000000000000001, 0)), keep=Keep.TOP, mode=Mode.PRIVATE)
    add(chamfer1_piece_29, mode=Mode.SUBTRACT)
    with BuildSketch(Plane(origin=(1.756830023, 31.65, 0), x_dir=(0, 0.9996219169112968, -0.027495876610586483), z_dir=(1, 0, 0))) as chamfer1_piece_30_section:
        Polygon((CHAMFER1_SIZE * 0.999621916911, CHAMFER1_SIZE * 0.0274958766106), (-CHAMFER1_SIZE * 0.0274958766106, CHAMFER1_SIZE * 0.999621916911), (0, 0), align=None)
    chamfer1_piece_30 = extrude(amount=6.786339953, mode=Mode.PRIVATE)
    chamfer1_piece_30 = split(chamfer1_piece_30, bisect_by=Plane(origin=(6.661066443, 32.682756147, 0.167332088), z_dir=(-0.8660254037844392, -0.4999999999999992, 0)), keep=Keep.TOP, mode=Mode.PRIVATE)
    chamfer1_piece_30 = split(chamfer1_piece_30, bisect_by=Plane(origin=(3.638933557, 32.682756147, 0.167332088), z_dir=(0.8660254037844388, -0.49999999999999983, 0)), keep=Keep.TOP, mode=Mode.PRIVATE)
    add(chamfer1_piece_30, mode=Mode.SUBTRACT)
    with BuildSketch(Plane(origin=(72.385592264, 23.236428601, 0), x_dir=(-0.8656979742248802, -0.49981095845564877, -0.02749587661058547), z_dir=(-0.5000000000000004, 0.8660254037844384, 0))) as chamfer1_piece_31a_section:
        Polygon((CHAMFER1_SIZE * 0.999621916911, CHAMFER1_SIZE * 0.0274958766106), (-CHAMFER1_SIZE * 0.0274958766106, CHAMFER1_SIZE * 0.999621916911), (0, 0), align=None)
    chamfer1_piece_31a = extrude(amount=6.786339953, mode=Mode.PRIVATE)
    chamfer1_piece_31a = split(chamfer1_piece_31a, bisect_by=Plane(origin=(71.890820617, 24.35, 0.161348719), z_dir=(0, -1, 0)), keep=Keep.TOP, mode=Mode.PRIVATE)
    with BuildSketch(Plane(origin=(77.243169977, 24.35, 0), x_dir=(0, -0.9996219169112968, -0.027495876610586292), z_dir=(-1, 0, 0))) as chamfer1_piece_31b_section:
        Polygon((CHAMFER1_SIZE * 0.999621916911, CHAMFER1_SIZE * 0.0274958766106), (-CHAMFER1_SIZE * 0.0274958766106, CHAMFER1_SIZE * 0.999621916911), (0, 0), align=None)
    chamfer1_piece_31b = extrude(amount=6.786339953, mode=Mode.PRIVATE)
    chamfer1_piece_31b = split(chamfer1_piece_31b, bisect_by=Plane(origin=(71.668596967, 24.478300884, 0.161348719), z_dir=(-0.8660254037844384, -0.5000000000000004, 0)), keep=Keep.TOP, mode=Mode.PRIVATE)
    chamfer1_piece_31 = chamfer1_piece_31a & chamfer1_piece_31b
    add(chamfer1_piece_31, mode=Mode.SUBTRACT)
    with BuildSketch(Plane(origin=(72.385592264, 23.236428601, 0), x_dir=(-0.8656979742248802, -0.49981095845564877, -0.02749587661058547), z_dir=(-0.5000000000000004, 0.8660254037844384, 0))) as chamfer1_piece_32a_section:
        Polygon((CHAMFER1_SIZE * 0.999621916911, CHAMFER1_SIZE * 0.0274958766106), (-CHAMFER1_SIZE * 0.0274958766106, CHAMFER1_SIZE * 0.999621916911), (0, 0), align=None)
    chamfer1_piece_32a = extrude(amount=6.786339953, mode=Mode.PRIVATE)
    chamfer1_piece_32a = split(chamfer1_piece_32a, bisect_by=Plane(origin=(69.709417585, 28.128300884, 0.161348719), z_dir=(-0.8660254037844369, 0.5000000000000031, 0)), keep=Keep.TOP, mode=Mode.PRIVATE)
    with BuildSketch(Plane(origin=(68.992422288, 26.886428601, 0), x_dir=(-0.8656979742248786, 0.4998109584556514, -0.027495876610586244), z_dir=(0.5000000000000031, 0.866025403784437, 0))) as chamfer1_piece_32b_section:
        Polygon((CHAMFER1_SIZE * 0.999621916911, CHAMFER1_SIZE * 0.0274958766106), (-CHAMFER1_SIZE * 0.0274958766106, CHAMFER1_SIZE * 0.999621916911), (0, 0), align=None)
    chamfer1_piece_32b = extrude(amount=6.786339953, mode=Mode.PRIVATE)
    chamfer1_piece_32b = split(chamfer1_piece_32b, bisect_by=Plane(origin=(69.709417585, 27.871699116, 0.161348719), z_dir=(-0.8660254037844384, -0.5000000000000004, 0)), keep=Keep.TOP, mode=Mode.PRIVATE)
    chamfer1_piece_32 = chamfer1_piece_32a & chamfer1_piece_32b
    add(chamfer1_piece_32, mode=Mode.SUBTRACT)
    with BuildSketch(Plane(origin=(68.992422288, 26.886428601, 0), x_dir=(-0.8656979742248786, 0.4998109584556514, -0.027495876610586244), z_dir=(0.5000000000000031, 0.866025403784437, 0))) as chamfer1_piece_33a_section:
        Polygon((CHAMFER1_SIZE * 0.999621916911, CHAMFER1_SIZE * 0.0274958766106), (-CHAMFER1_SIZE * 0.0274958766106, CHAMFER1_SIZE * 0.999621916911), (0, 0), align=None)
    chamfer1_piece_33a = extrude(amount=6.786339953, mode=Mode.PRIVATE)
    chamfer1_piece_33a = split(chamfer1_piece_33a, bisect_by=Plane(origin=(71.890820617, 31.65, 0.161348719), z_dir=(0, 1, 0)), keep=Keep.TOP, mode=Mode.PRIVATE)
    with BuildSketch(Plane(origin=(70.456830023, 31.65, 0), x_dir=(0, 0.9996219169112968, -0.027495876610586483), z_dir=(1, 0, 0))) as chamfer1_piece_33b_section:
        Polygon((CHAMFER1_SIZE * 0.999621916911, CHAMFER1_SIZE * 0.0274958766106), (-CHAMFER1_SIZE * 0.0274958766106, CHAMFER1_SIZE * 0.999621916911), (0, 0), align=None)
    chamfer1_piece_33b = extrude(amount=6.786339953, mode=Mode.PRIVATE)
    chamfer1_piece_33b = split(chamfer1_piece_33b, bisect_by=Plane(origin=(71.668596967, 31.521699116, 0.161348719), z_dir=(-0.8660254037844369, 0.5000000000000031, 0)), keep=Keep.TOP, mode=Mode.PRIVATE)
    chamfer1_piece_33 = chamfer1_piece_33a & chamfer1_piece_33b
    add(chamfer1_piece_33, mode=Mode.SUBTRACT)
    with BuildSketch(Plane(origin=(70.456830023, 31.65, 0), x_dir=(0, 0.9996219169112968, -0.027495876610586483), z_dir=(1, 0, 0))) as chamfer1_piece_34a_section:
        Polygon((CHAMFER1_SIZE * 0.999621916911, CHAMFER1_SIZE * 0.0274958766106), (-CHAMFER1_SIZE * 0.0274958766106, CHAMFER1_SIZE * 0.999621916911), (0, 0), align=None)
    chamfer1_piece_34a = extrude(amount=6.786339953, mode=Mode.PRIVATE)
    chamfer1_piece_34a = split(chamfer1_piece_34a, bisect_by=Plane(origin=(76.031403033, 31.521699116, 0.161348719), z_dir=(0.8660254037844393, 0.499999999999999, 0)), keep=Keep.TOP, mode=Mode.PRIVATE)
    with BuildSketch(Plane(origin=(75.314407736, 32.763571399, 0), x_dir=(0.8656979742248809, 0.4998109584556474, -0.02749587661058581), z_dir=(0.499999999999999, -0.8660254037844393, 0))) as chamfer1_piece_34b_section:
        Polygon((CHAMFER1_SIZE * 0.999621916911, CHAMFER1_SIZE * 0.0274958766106), (-CHAMFER1_SIZE * 0.0274958766106, CHAMFER1_SIZE * 0.999621916911), (0, 0), align=None)
    chamfer1_piece_34b = extrude(amount=6.786339953, mode=Mode.PRIVATE)
    chamfer1_piece_34b = split(chamfer1_piece_34b, bisect_by=Plane(origin=(75.809179383, 31.65, 0.161348719), z_dir=(0, 1, 0)), keep=Keep.TOP, mode=Mode.PRIVATE)
    chamfer1_piece_34 = chamfer1_piece_34a & chamfer1_piece_34b
    add(chamfer1_piece_34, mode=Mode.SUBTRACT)
    with BuildSketch(Plane(origin=(78.707577712, 29.113571399, 0), x_dir=(0.8656979742248807, -0.4998109584556477, -0.02749587661058552), z_dir=(-0.4999999999999994, -0.866025403784439, 0))) as chamfer1_piece_35a_section:
        Polygon((CHAMFER1_SIZE * 0.999621916911, CHAMFER1_SIZE * 0.0274958766106), (-CHAMFER1_SIZE * 0.0274958766106, CHAMFER1_SIZE * 0.999621916911), (0, 0), align=None)
    chamfer1_piece_35a = extrude(amount=6.786339953, mode=Mode.PRIVATE)
    chamfer1_piece_35a = split(chamfer1_piece_35a, bisect_by=Plane(origin=(77.990582415, 28.128300884, 0.161348719), z_dir=(0.8660254037844393, 0.499999999999999, 0)), keep=Keep.TOP, mode=Mode.PRIVATE)
    with BuildSketch(Plane(origin=(75.314407736, 32.763571399, 0), x_dir=(0.8656979742248809, 0.4998109584556474, -0.02749587661058581), z_dir=(0.499999999999999, -0.8660254037844393, 0))) as chamfer1_piece_35b_section:
        Polygon((CHAMFER1_SIZE * 0.999621916911, CHAMFER1_SIZE * 0.0274958766106), (-CHAMFER1_SIZE * 0.0274958766106, CHAMFER1_SIZE * 0.999621916911), (0, 0), align=None)
    chamfer1_piece_35b = extrude(amount=6.786339953, mode=Mode.PRIVATE)
    chamfer1_piece_35b = split(chamfer1_piece_35b, bisect_by=Plane(origin=(77.990582415, 27.871699116, 0.161348719), z_dir=(0.866025403784439, -0.4999999999999994, 0)), keep=Keep.TOP, mode=Mode.PRIVATE)
    chamfer1_piece_35 = chamfer1_piece_35a & chamfer1_piece_35b
    add(chamfer1_piece_35, mode=Mode.SUBTRACT)
    with BuildSketch(Plane(origin=(77.243169977, 24.35, 0), x_dir=(0, -0.9996219169112968, -0.027495876610586292), z_dir=(-1, 0, 0))) as chamfer1_piece_36a_section:
        Polygon((CHAMFER1_SIZE * 0.999621916911, CHAMFER1_SIZE * 0.0274958766106), (-CHAMFER1_SIZE * 0.0274958766106, CHAMFER1_SIZE * 0.999621916911), (0, 0), align=None)
    chamfer1_piece_36a = extrude(amount=6.786339953, mode=Mode.PRIVATE)
    chamfer1_piece_36a = split(chamfer1_piece_36a, bisect_by=Plane(origin=(76.031403033, 24.478300884, 0.161348719), z_dir=(0.866025403784439, -0.4999999999999994, 0)), keep=Keep.TOP, mode=Mode.PRIVATE)
    with BuildSketch(Plane(origin=(78.707577712, 29.113571399, 0), x_dir=(0.8656979742248807, -0.4998109584556477, -0.02749587661058552), z_dir=(-0.4999999999999994, -0.866025403784439, 0))) as chamfer1_piece_36b_section:
        Polygon((CHAMFER1_SIZE * 0.999621916911, CHAMFER1_SIZE * 0.0274958766106), (-CHAMFER1_SIZE * 0.0274958766106, CHAMFER1_SIZE * 0.999621916911), (0, 0), align=None)
    chamfer1_piece_36b = extrude(amount=6.786339953, mode=Mode.PRIVATE)
    chamfer1_piece_36b = split(chamfer1_piece_36b, bisect_by=Plane(origin=(75.809179383, 24.35, 0.161348719), z_dir=(0, -1, 0)), keep=Keep.TOP, mode=Mode.PRIVATE)
    chamfer1_piece_36 = chamfer1_piece_36a & chamfer1_piece_36b
    add(chamfer1_piece_36, mode=Mode.SUBTRACT)
    with BuildSketch(Plane(origin=(6.614407736, 32.763571399, 0), x_dir=(0.8656979742248808, 0.4998109584556476, -0.02749587661058651), z_dir=(0.4999999999999992, -0.8660254037844392, 0))) as chamfer1_piece_37a_section:
        Polygon((CHAMFER1_SIZE * 0.999621916911, CHAMFER1_SIZE * 0.0274958766106), (-CHAMFER1_SIZE * 0.0274958766106, CHAMFER1_SIZE * 0.999621916911), (0, 0), align=None)
    chamfer1_piece_37a = extrude(amount=6.786339953, mode=Mode.PRIVATE)
    chamfer1_piece_37a = split(chamfer1_piece_37a, bisect_by=Plane(origin=(7.109179383, 31.65, 0.161348719), z_dir=(0, 1, 0)), keep=Keep.TOP, mode=Mode.PRIVATE)
    with BuildSketch(Plane(origin=(1.756830023, 31.65, 0), x_dir=(0, 0.9996219169112968, -0.027495876610586483), z_dir=(1, 0, 0))) as chamfer1_piece_37b_section:
        Polygon((CHAMFER1_SIZE * 0.999621916911, CHAMFER1_SIZE * 0.0274958766106), (-CHAMFER1_SIZE * 0.0274958766106, CHAMFER1_SIZE * 0.999621916911), (0, 0), align=None)
    chamfer1_piece_37b = extrude(amount=6.786339953, mode=Mode.PRIVATE)
    chamfer1_piece_37b = split(chamfer1_piece_37b, bisect_by=Plane(origin=(7.331403033, 31.521699116, 0.161348719), z_dir=(0.8660254037844392, 0.4999999999999992, 0)), keep=Keep.TOP, mode=Mode.PRIVATE)
    chamfer1_piece_37 = chamfer1_piece_37a & chamfer1_piece_37b
    add(chamfer1_piece_37, mode=Mode.SUBTRACT)
    with BuildSketch(Plane(origin=(6.614407736, 32.763571399, 0), x_dir=(0.8656979742248808, 0.4998109584556476, -0.02749587661058651), z_dir=(0.4999999999999992, -0.8660254037844392, 0))) as chamfer1_piece_38a_section:
        Polygon((CHAMFER1_SIZE * 0.999621916911, CHAMFER1_SIZE * 0.0274958766106), (-CHAMFER1_SIZE * 0.0274958766106, CHAMFER1_SIZE * 0.999621916911), (0, 0), align=None)
    chamfer1_piece_38a = extrude(amount=6.786339953, mode=Mode.PRIVATE)
    chamfer1_piece_38a = split(chamfer1_piece_38a, bisect_by=Plane(origin=(9.290582415, 27.871699116, 0.161348719), z_dir=(0.8660254037844382, -0.5000000000000009, 0)), keep=Keep.TOP, mode=Mode.PRIVATE)
    with BuildSketch(Plane(origin=(10.007577712, 29.113571399, 0), x_dir=(0.8656979742248798, -0.4998109584556492, -0.02749587661058651), z_dir=(-0.5000000000000009, -0.8660254037844382, 0))) as chamfer1_piece_38b_section:
        Polygon((CHAMFER1_SIZE * 0.999621916911, CHAMFER1_SIZE * 0.0274958766106), (-CHAMFER1_SIZE * 0.0274958766106, CHAMFER1_SIZE * 0.999621916911), (0, 0), align=None)
    chamfer1_piece_38b = extrude(amount=6.786339953, mode=Mode.PRIVATE)
    chamfer1_piece_38b = split(chamfer1_piece_38b, bisect_by=Plane(origin=(9.290582415, 28.128300884, 0.161348719), z_dir=(0.8660254037844392, 0.4999999999999992, 0)), keep=Keep.TOP, mode=Mode.PRIVATE)
    chamfer1_piece_38 = chamfer1_piece_38a & chamfer1_piece_38b
    add(chamfer1_piece_38, mode=Mode.SUBTRACT)
    with BuildSketch(Plane(origin=(10.007577712, 29.113571399, 0), x_dir=(0.8656979742248798, -0.4998109584556492, -0.02749587661058651), z_dir=(-0.5000000000000009, -0.8660254037844382, 0))) as chamfer1_piece_39a_section:
        Polygon((CHAMFER1_SIZE * 0.999621916911, CHAMFER1_SIZE * 0.0274958766106), (-CHAMFER1_SIZE * 0.0274958766106, CHAMFER1_SIZE * 0.999621916911), (0, 0), align=None)
    chamfer1_piece_39a = extrude(amount=6.786339953, mode=Mode.PRIVATE)
    chamfer1_piece_39a = split(chamfer1_piece_39a, bisect_by=Plane(origin=(7.109179383, 24.35, 0.161348719), z_dir=(0, -1, 0)), keep=Keep.TOP, mode=Mode.PRIVATE)
    with BuildSketch(Plane(origin=(8.543169977, 24.35, 0), x_dir=(0, -0.9996219169112968, -0.027495876610586292), z_dir=(-1, 0, 0))) as chamfer1_piece_39b_section:
        Polygon((CHAMFER1_SIZE * 0.999621916911, CHAMFER1_SIZE * 0.0274958766106), (-CHAMFER1_SIZE * 0.0274958766106, CHAMFER1_SIZE * 0.999621916911), (0, 0), align=None)
    chamfer1_piece_39b = extrude(amount=6.786339953, mode=Mode.PRIVATE)
    chamfer1_piece_39b = split(chamfer1_piece_39b, bisect_by=Plane(origin=(7.331403033, 24.478300884, 0.161348719), z_dir=(0.8660254037844382, -0.5000000000000009, 0)), keep=Keep.TOP, mode=Mode.PRIVATE)
    chamfer1_piece_39 = chamfer1_piece_39a & chamfer1_piece_39b
    add(chamfer1_piece_39, mode=Mode.SUBTRACT)
    with BuildSketch(Plane(origin=(8.543169977, 24.35, 0), x_dir=(0, -0.9996219169112968, -0.027495876610586292), z_dir=(-1, 0, 0))) as chamfer1_piece_40a_section:
        Polygon((CHAMFER1_SIZE * 0.999621916911, CHAMFER1_SIZE * 0.0274958766106), (-CHAMFER1_SIZE * 0.0274958766106, CHAMFER1_SIZE * 0.999621916911), (0, 0), align=None)
    chamfer1_piece_40a = extrude(amount=6.786339953, mode=Mode.PRIVATE)
    chamfer1_piece_40a = split(chamfer1_piece_40a, bisect_by=Plane(origin=(2.968596967, 24.478300884, 0.161348719), z_dir=(-0.8660254037844387, -0.5000000000000001, 0)), keep=Keep.TOP, mode=Mode.PRIVATE)
    with BuildSketch(Plane(origin=(3.685592264, 23.236428601, 0), x_dir=(-0.8656979742248803, -0.4998109584556484, -0.02749587661058664), z_dir=(-0.5000000000000001, 0.8660254037844387, 0))) as chamfer1_piece_40b_section:
        Polygon((CHAMFER1_SIZE * 0.999621916911, CHAMFER1_SIZE * 0.0274958766106), (-CHAMFER1_SIZE * 0.0274958766106, CHAMFER1_SIZE * 0.999621916911), (0, 0), align=None)
    chamfer1_piece_40b = extrude(amount=6.786339953, mode=Mode.PRIVATE)
    chamfer1_piece_40b = split(chamfer1_piece_40b, bisect_by=Plane(origin=(3.190820617, 24.35, 0.161348719), z_dir=(0, -1, 0)), keep=Keep.TOP, mode=Mode.PRIVATE)
    chamfer1_piece_40 = chamfer1_piece_40a & chamfer1_piece_40b
    add(chamfer1_piece_40, mode=Mode.SUBTRACT)
    with BuildSketch(Plane(origin=(0.292422288, 26.886428601, 0), x_dir=(-0.8656979742248805, 0.49981095845564816, -0.027495876610586473), z_dir=(0.49999999999999983, 0.8660254037844388, 0))) as chamfer1_piece_41a_section:
        Polygon((CHAMFER1_SIZE * 0.999621916911, CHAMFER1_SIZE * 0.0274958766106), (-CHAMFER1_SIZE * 0.0274958766106, CHAMFER1_SIZE * 0.999621916911), (0, 0), align=None)
    chamfer1_piece_41a = extrude(amount=6.786339953, mode=Mode.PRIVATE)
    chamfer1_piece_41a = split(chamfer1_piece_41a, bisect_by=Plane(origin=(1.009417585, 27.871699116, 0.161348719), z_dir=(-0.8660254037844387, -0.5000000000000001, 0)), keep=Keep.TOP, mode=Mode.PRIVATE)
    with BuildSketch(Plane(origin=(3.685592264, 23.236428601, 0), x_dir=(-0.8656979742248803, -0.4998109584556484, -0.02749587661058664), z_dir=(-0.5000000000000001, 0.8660254037844387, 0))) as chamfer1_piece_41b_section:
        Polygon((CHAMFER1_SIZE * 0.999621916911, CHAMFER1_SIZE * 0.0274958766106), (-CHAMFER1_SIZE * 0.0274958766106, CHAMFER1_SIZE * 0.999621916911), (0, 0), align=None)
    chamfer1_piece_41b = extrude(amount=6.786339953, mode=Mode.PRIVATE)
    chamfer1_piece_41b = split(chamfer1_piece_41b, bisect_by=Plane(origin=(1.009417585, 28.128300884, 0.161348719), z_dir=(-0.8660254037844388, 0.49999999999999983, 0)), keep=Keep.TOP, mode=Mode.PRIVATE)
    chamfer1_piece_41 = chamfer1_piece_41a & chamfer1_piece_41b
    add(chamfer1_piece_41, mode=Mode.SUBTRACT)
    with BuildSketch(Plane(origin=(1.756830023, 31.65, 0), x_dir=(0, 0.9996219169112968, -0.027495876610586483), z_dir=(1, 0, 0))) as chamfer1_piece_42a_section:
        Polygon((CHAMFER1_SIZE * 0.999621916911, CHAMFER1_SIZE * 0.0274958766106), (-CHAMFER1_SIZE * 0.0274958766106, CHAMFER1_SIZE * 0.999621916911), (0, 0), align=None)
    chamfer1_piece_42a = extrude(amount=6.786339953, mode=Mode.PRIVATE)
    chamfer1_piece_42a = split(chamfer1_piece_42a, bisect_by=Plane(origin=(2.968596967, 31.521699116, 0.161348719), z_dir=(-0.8660254037844388, 0.49999999999999983, 0)), keep=Keep.TOP, mode=Mode.PRIVATE)
    with BuildSketch(Plane(origin=(0.292422288, 26.886428601, 0), x_dir=(-0.8656979742248805, 0.49981095845564816, -0.027495876610586473), z_dir=(0.49999999999999983, 0.8660254037844388, 0))) as chamfer1_piece_42b_section:
        Polygon((CHAMFER1_SIZE * 0.999621916911, CHAMFER1_SIZE * 0.0274958766106), (-CHAMFER1_SIZE * 0.0274958766106, CHAMFER1_SIZE * 0.999621916911), (0, 0), align=None)
    chamfer1_piece_42b = extrude(amount=6.786339953, mode=Mode.PRIVATE)
    chamfer1_piece_42b = split(chamfer1_piece_42b, bisect_by=Plane(origin=(3.190820617, 31.65, 0.161348719), z_dir=(0, 1, 0)), keep=Keep.TOP, mode=Mode.PRIVATE)
    chamfer1_piece_42 = chamfer1_piece_42a & chamfer1_piece_42b
    add(chamfer1_piece_42, mode=Mode.SUBTRACT)

    # Chamfer2
    chamfer2_edges = [part.edges().sort_by_distance(p)[0] for p in [
        (42.25, 10, 4.6),
        (42.25, 60, 4.6),
    ]]
    chamfer(chamfer2_edges, length=CHAMFER2_SIZE)


solid = part.part
